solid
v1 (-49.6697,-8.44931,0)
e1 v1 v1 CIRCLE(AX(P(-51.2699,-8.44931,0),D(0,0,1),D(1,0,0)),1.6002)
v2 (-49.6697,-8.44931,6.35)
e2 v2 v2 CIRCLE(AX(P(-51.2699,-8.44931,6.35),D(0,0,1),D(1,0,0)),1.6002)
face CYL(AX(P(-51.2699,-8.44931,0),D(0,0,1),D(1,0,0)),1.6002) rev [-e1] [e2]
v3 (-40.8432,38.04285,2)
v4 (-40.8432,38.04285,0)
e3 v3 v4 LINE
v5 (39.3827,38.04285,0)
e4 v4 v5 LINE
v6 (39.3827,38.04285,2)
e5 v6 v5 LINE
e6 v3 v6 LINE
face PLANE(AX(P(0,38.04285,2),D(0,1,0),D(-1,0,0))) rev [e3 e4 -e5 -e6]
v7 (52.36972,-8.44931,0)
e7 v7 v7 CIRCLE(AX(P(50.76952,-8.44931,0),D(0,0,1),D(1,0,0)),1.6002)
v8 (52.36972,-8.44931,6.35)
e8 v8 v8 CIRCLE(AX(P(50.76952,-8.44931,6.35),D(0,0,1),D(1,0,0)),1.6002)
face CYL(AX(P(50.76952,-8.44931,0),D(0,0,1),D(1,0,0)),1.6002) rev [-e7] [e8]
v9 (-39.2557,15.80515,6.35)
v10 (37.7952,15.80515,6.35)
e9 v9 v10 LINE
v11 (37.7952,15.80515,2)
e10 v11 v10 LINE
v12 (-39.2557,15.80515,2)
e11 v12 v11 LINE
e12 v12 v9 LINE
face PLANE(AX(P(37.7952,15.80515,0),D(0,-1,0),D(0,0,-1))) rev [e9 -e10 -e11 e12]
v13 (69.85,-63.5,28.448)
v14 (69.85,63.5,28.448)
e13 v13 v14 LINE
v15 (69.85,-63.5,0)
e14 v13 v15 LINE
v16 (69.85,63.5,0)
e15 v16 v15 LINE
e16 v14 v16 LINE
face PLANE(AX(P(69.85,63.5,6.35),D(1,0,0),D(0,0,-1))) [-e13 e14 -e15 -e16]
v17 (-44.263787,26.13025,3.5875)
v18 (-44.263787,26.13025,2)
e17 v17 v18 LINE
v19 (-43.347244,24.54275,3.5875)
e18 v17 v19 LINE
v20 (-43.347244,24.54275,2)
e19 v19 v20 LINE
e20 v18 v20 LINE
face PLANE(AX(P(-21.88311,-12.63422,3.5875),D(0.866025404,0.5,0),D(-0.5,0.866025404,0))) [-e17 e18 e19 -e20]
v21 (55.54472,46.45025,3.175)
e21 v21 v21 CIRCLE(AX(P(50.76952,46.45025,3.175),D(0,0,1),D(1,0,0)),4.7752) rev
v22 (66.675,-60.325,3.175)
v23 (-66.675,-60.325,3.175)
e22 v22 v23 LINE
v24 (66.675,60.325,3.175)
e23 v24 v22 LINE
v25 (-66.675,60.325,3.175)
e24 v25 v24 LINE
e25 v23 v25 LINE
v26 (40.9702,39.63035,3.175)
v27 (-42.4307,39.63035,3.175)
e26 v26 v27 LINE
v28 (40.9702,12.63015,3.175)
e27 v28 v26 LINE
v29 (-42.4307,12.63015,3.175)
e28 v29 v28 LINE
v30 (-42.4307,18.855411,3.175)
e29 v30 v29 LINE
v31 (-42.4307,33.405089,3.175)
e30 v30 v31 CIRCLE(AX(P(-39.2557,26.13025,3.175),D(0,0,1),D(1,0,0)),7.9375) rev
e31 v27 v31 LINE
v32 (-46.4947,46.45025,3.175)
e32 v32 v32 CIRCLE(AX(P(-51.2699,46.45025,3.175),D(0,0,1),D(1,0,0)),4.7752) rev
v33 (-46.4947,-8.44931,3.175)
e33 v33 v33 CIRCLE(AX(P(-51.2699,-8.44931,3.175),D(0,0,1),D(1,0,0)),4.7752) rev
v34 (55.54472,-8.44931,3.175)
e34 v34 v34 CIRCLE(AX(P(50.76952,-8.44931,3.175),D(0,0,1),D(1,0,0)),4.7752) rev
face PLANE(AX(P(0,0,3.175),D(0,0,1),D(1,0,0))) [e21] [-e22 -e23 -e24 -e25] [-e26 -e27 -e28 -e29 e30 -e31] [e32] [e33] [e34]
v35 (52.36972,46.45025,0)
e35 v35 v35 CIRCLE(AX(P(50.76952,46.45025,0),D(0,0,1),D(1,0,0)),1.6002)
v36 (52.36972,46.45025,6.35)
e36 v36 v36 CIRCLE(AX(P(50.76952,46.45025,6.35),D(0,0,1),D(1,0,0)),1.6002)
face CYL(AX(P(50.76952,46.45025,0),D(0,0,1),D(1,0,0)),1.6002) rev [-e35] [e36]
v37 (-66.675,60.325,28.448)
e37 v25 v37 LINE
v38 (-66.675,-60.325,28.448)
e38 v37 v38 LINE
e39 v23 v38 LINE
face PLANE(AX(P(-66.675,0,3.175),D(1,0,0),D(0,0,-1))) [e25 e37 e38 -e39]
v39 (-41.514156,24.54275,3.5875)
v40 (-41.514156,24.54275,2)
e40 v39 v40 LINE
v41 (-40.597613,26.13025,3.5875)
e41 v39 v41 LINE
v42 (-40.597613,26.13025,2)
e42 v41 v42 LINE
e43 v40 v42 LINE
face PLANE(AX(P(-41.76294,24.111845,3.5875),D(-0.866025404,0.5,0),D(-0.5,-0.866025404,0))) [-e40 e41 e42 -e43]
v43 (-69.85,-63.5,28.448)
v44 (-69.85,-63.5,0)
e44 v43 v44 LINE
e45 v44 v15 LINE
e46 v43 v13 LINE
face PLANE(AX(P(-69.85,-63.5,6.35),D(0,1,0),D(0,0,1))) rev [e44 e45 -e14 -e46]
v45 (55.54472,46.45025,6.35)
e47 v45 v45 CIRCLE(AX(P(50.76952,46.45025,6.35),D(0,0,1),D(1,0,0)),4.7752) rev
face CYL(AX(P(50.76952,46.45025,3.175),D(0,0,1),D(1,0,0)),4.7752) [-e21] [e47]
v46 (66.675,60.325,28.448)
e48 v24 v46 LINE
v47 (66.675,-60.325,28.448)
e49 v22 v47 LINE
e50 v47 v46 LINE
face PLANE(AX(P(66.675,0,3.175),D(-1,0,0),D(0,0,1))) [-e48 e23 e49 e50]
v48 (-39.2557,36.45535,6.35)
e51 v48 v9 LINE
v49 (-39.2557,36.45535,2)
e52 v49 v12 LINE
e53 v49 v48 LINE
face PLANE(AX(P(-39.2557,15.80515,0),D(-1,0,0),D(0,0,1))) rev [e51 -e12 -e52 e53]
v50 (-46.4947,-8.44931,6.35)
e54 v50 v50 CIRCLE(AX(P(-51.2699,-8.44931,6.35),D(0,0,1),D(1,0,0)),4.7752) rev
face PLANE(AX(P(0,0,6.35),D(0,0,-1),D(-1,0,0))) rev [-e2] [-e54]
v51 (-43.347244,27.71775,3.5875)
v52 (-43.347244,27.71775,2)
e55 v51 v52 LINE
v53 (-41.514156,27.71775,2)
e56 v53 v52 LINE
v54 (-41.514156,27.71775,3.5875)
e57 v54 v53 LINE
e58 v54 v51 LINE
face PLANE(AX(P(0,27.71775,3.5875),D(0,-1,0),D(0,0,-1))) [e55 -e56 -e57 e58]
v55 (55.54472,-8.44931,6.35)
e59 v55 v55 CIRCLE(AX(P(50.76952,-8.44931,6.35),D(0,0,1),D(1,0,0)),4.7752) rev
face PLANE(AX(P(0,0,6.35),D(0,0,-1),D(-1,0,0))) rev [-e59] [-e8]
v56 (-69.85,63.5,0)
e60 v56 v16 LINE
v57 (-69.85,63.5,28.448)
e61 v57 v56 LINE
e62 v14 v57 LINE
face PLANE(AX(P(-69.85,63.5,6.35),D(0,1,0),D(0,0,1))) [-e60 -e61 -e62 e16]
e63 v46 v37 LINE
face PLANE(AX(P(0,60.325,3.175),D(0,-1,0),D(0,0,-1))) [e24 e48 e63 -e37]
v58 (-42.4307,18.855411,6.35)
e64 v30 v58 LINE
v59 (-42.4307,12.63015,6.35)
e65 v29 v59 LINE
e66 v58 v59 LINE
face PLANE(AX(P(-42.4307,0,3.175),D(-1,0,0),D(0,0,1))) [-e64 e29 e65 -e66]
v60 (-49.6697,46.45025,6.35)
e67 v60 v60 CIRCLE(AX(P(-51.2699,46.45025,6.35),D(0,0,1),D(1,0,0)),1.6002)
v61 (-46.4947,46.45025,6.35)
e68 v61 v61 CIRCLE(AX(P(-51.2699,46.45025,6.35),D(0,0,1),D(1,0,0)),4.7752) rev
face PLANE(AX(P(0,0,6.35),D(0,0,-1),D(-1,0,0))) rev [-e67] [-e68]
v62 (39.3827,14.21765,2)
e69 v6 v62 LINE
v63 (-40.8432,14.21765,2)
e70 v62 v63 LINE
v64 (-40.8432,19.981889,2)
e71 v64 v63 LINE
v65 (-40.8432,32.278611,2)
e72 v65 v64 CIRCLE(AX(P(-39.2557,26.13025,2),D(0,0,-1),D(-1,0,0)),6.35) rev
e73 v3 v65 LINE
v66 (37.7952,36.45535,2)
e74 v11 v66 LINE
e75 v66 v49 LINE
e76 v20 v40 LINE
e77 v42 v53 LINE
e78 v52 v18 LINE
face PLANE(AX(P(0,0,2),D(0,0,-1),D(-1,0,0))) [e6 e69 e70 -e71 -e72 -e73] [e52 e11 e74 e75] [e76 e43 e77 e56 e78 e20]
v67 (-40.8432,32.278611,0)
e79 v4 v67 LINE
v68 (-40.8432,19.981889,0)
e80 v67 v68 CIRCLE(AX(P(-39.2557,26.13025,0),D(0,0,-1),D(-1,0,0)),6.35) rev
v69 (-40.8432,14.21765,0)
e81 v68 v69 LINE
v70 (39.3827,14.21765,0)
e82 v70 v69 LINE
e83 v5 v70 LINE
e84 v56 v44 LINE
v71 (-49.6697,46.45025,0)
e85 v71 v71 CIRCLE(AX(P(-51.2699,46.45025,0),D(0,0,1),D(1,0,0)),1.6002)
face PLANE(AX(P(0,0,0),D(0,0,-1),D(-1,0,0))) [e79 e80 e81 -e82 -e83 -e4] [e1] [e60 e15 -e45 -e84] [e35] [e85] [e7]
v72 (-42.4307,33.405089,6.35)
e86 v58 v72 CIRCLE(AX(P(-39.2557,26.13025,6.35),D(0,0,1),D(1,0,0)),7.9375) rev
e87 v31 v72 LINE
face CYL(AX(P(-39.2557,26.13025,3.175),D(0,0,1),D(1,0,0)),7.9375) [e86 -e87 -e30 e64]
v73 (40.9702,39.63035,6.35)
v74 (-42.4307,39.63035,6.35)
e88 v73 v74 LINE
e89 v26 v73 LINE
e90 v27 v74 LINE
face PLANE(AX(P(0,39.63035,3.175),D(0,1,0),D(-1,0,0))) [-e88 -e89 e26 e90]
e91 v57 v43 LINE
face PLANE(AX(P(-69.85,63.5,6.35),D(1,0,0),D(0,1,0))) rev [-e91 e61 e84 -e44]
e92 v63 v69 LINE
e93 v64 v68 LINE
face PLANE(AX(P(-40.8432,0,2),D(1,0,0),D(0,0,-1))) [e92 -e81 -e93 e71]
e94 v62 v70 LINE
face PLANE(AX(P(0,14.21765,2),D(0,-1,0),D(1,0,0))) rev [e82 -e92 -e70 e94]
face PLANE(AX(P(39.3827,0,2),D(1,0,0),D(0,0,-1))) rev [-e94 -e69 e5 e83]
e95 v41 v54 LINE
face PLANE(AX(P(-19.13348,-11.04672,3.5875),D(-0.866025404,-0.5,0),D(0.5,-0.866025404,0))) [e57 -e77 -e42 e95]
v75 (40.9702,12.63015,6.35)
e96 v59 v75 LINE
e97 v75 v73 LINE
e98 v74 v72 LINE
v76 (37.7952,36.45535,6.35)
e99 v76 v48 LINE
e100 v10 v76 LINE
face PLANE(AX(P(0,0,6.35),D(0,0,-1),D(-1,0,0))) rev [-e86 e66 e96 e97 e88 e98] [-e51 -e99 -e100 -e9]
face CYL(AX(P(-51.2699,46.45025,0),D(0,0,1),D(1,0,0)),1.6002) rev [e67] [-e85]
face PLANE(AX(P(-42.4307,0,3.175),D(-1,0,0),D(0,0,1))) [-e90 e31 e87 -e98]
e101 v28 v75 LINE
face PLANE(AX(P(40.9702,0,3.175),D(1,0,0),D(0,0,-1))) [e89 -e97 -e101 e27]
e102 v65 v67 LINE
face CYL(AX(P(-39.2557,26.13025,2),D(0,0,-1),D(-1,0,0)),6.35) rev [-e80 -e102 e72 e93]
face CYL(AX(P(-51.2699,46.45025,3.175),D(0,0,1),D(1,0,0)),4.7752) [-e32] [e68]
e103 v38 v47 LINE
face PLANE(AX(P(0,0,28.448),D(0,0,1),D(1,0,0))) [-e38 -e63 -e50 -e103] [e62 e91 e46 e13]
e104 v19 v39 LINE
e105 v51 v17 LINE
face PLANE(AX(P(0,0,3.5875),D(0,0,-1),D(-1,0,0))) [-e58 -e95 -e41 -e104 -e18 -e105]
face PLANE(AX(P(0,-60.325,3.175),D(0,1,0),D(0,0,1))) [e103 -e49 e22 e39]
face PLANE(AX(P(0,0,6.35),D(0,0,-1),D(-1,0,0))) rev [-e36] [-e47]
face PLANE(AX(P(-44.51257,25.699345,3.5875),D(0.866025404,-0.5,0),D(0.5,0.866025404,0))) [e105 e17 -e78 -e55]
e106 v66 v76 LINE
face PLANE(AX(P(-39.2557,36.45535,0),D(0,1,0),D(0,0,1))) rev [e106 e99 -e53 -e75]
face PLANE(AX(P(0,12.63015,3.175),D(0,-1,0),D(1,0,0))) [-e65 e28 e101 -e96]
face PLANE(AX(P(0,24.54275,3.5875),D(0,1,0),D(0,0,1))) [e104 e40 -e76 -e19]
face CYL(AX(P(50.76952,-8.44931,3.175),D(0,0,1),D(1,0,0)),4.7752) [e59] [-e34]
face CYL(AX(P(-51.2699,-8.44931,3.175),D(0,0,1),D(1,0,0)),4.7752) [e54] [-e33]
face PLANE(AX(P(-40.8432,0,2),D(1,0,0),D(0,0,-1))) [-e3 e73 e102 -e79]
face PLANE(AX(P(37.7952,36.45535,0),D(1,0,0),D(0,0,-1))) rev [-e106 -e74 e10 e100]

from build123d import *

# Parameters (mm, degrees)
SKETCH1_W                  = 139.7
SKETCH1_H                  = 127
PLATE_WIDTH_DEPTH          = 6.35
SKETCH2_R                  = 1.6002
SKETCH2_W                  = 77.0509
SKETCH2_H                  = 20.6502
THROUGH_HOLES_DEPTH        = 6.35
SKETCH3_R                  = 6.35
SKETCH3_W                  = 80.2259
SKETCH3_H                  = 23.8252
SKETCH3_W_2                = 77.0509
SKETCH3_H_2                = 20.6502
COVER_CUTOUT_DEPTH         = 2
NUT_INSET_DEPTH            = 1.5875
MATERIAL_REMOVAL_OUTLINE_W = 133.35
MATERIAL_REMOVAL_OUTLINE_H = 120.65
MATERIAL_REMOVAL_OUTLINE_R = 4.7752
MATERIAL_REMOVAL_DEPTH     = 3.175
SKETCH6_W                  = 139.7
SKETCH6_H                  = 127
SKETCH6_W_2                = 133.35
SKETCH6_H_2                = 120.65
BOSS_EXTRUDE1_DEPTH        = 22.098


# Read off the part's stored shape, not the designer's step: Material Removal
with BuildPart() as part:
    # Sketch1 → Plate Width (new body)
    with BuildSketch(Plane.XY):
        Rectangle(SKETCH1_W, SKETCH1_H)
    extrude(amount=PLATE_WIDTH_DEPTH)

    # Sketch2 → Through Holes (cut)
    with BuildSketch(Plane.XY.offset(6.35)):
        with Locations((-51.2699, 46.45025)):
            Circle(SKETCH2_R)
        with Locations((-51.2699, -8.44931)):
            Circle(SKETCH2_R)
        with Locations((50.76952, -8.44931)):
            Circle(SKETCH2_R)
        with Locations((50.76952, 46.45025)):
            Circle(SKETCH2_R)
        with Locations((-0.73025, 26.13025)):
            Rectangle(SKETCH2_W, SKETCH2_H)
    extrude(amount=-THROUGH_HOLES_DEPTH, mode=Mode.SUBTRACT)

    # Sketch3 → Cover Cutout (cut)
    # profile 1 of 4: a face of its own
    with BuildSketch(Plane.XY):
        with Locations((-39.2557, 26.13025)):
            Circle(SKETCH3_R)
    # profile 2 of 4: a face of its own
    with BuildSketch(Plane.XY):
        with Locations((-0.73025, 26.13025)):
            Rectangle(SKETCH3_W, SKETCH3_H)
        with Locations((-0.73025, 26.13025)):
            Rectangle(SKETCH3_W_2, SKETCH3_H_2, mode=Mode.SUBTRACT)
    # profile 3 of 4: a face of its own
    with BuildSketch(Plane.XY):
        with BuildLine():
            Line((-40.8432, 19.981888938), (-40.8432, 32.278611062))
            ThreePointArc((-40.8432, 32.278611062), (-45.6057, 26.13025), (-40.8432, 19.981888938))
        make_face()
    # profile 4 of 4: a face of its own
    with BuildSketch(Plane.XY):
        with BuildLine():
            Line((-39.2557, 19.78025), (-39.2557, 32.48025))
            ThreePointArc((-39.2557, 32.48025), (-40.055827257, 32.429638571), (-40.8432, 32.278611062))
            Line((-40.8432, 32.278611062), (-40.8432, 19.981888938))
            ThreePointArc((-40.8432, 19.981888938), (-40.055827257, 19.830861429), (-39.2557, 19.78025))
        make_face()
    extrude(amount=COVER_CUTOUT_DEPTH, mode=Mode.SUBTRACT)

    # Sketch4 → Nut Inset (cut)
    with BuildSketch(Plane.XY.offset(2)):
        Polygon((-41.514156448, 24.54275), (-40.597612895, 26.13025), (-41.514156448, 27.71775), (-43.347243552, 27.71775), (-44.263787105, 26.13025), (-43.347243552, 24.54275), align=None)
    extrude(amount=NUT_INSET_DEPTH, mode=Mode.SUBTRACT)

    # Material Removal outline → Material Removal (cut)
    with BuildSketch(Plane(origin=(0, 0, 6.35), x_dir=(-1, 0, 0), z_dir=(0, 0, -1))):
        Rectangle(MATERIAL_REMOVAL_OUTLINE_W, MATERIAL_REMOVAL_OUTLINE_H)
        with Locations((-50.76952, -8.44931)):
            Circle(MATERIAL_REMOVAL_OUTLINE_R, mode=Mode.SUBTRACT)
        with Locations((51.2699, -8.44931)):
            Circle(MATERIAL_REMOVAL_OUTLINE_R, mode=Mode.SUBTRACT)
        with Locations((-50.76952, 46.45025)):
            Circle(MATERIAL_REMOVAL_OUTLINE_R, mode=Mode.SUBTRACT)
        with BuildLine():
            Line((42.4307, 39.63035), (42.4307, 33.405088916))
            ThreePointArc((42.4307, 33.405088916), (47.1932, 26.13025), (42.4307, 18.855411084))
            Line((42.4307, 18.855411084), (42.4307, 12.63015))
            Line((42.4307, 12.63015), (-40.9702, 12.63015))
            Line((-40.9702, 12.63015), (-40.9702, 39.63035))
            Line((-40.9702, 39.63035), (42.4307, 39.63035))
        make_face(mode=Mode.SUBTRACT)
        with Locations((51.2699, 46.45025)):
            Circle(MATERIAL_REMOVAL_OUTLINE_R, mode=Mode.SUBTRACT)
    extrude(amount=MATERIAL_REMOVAL_DEPTH, mode=Mode.SUBTRACT)

    # Sketch6 → Boss-Extrude1 (add)
    with BuildSketch(Plane.XY.offset(6.35)):
        Rectangle(SKETCH6_W, SKETCH6_H)
        Rectangle(SKETCH6_W_2, SKETCH6_H_2, mode=Mode.SUBTRACT)
    extrude(amount=BOSS_EXTRUDE1_DEPTH)


solid = part.part
